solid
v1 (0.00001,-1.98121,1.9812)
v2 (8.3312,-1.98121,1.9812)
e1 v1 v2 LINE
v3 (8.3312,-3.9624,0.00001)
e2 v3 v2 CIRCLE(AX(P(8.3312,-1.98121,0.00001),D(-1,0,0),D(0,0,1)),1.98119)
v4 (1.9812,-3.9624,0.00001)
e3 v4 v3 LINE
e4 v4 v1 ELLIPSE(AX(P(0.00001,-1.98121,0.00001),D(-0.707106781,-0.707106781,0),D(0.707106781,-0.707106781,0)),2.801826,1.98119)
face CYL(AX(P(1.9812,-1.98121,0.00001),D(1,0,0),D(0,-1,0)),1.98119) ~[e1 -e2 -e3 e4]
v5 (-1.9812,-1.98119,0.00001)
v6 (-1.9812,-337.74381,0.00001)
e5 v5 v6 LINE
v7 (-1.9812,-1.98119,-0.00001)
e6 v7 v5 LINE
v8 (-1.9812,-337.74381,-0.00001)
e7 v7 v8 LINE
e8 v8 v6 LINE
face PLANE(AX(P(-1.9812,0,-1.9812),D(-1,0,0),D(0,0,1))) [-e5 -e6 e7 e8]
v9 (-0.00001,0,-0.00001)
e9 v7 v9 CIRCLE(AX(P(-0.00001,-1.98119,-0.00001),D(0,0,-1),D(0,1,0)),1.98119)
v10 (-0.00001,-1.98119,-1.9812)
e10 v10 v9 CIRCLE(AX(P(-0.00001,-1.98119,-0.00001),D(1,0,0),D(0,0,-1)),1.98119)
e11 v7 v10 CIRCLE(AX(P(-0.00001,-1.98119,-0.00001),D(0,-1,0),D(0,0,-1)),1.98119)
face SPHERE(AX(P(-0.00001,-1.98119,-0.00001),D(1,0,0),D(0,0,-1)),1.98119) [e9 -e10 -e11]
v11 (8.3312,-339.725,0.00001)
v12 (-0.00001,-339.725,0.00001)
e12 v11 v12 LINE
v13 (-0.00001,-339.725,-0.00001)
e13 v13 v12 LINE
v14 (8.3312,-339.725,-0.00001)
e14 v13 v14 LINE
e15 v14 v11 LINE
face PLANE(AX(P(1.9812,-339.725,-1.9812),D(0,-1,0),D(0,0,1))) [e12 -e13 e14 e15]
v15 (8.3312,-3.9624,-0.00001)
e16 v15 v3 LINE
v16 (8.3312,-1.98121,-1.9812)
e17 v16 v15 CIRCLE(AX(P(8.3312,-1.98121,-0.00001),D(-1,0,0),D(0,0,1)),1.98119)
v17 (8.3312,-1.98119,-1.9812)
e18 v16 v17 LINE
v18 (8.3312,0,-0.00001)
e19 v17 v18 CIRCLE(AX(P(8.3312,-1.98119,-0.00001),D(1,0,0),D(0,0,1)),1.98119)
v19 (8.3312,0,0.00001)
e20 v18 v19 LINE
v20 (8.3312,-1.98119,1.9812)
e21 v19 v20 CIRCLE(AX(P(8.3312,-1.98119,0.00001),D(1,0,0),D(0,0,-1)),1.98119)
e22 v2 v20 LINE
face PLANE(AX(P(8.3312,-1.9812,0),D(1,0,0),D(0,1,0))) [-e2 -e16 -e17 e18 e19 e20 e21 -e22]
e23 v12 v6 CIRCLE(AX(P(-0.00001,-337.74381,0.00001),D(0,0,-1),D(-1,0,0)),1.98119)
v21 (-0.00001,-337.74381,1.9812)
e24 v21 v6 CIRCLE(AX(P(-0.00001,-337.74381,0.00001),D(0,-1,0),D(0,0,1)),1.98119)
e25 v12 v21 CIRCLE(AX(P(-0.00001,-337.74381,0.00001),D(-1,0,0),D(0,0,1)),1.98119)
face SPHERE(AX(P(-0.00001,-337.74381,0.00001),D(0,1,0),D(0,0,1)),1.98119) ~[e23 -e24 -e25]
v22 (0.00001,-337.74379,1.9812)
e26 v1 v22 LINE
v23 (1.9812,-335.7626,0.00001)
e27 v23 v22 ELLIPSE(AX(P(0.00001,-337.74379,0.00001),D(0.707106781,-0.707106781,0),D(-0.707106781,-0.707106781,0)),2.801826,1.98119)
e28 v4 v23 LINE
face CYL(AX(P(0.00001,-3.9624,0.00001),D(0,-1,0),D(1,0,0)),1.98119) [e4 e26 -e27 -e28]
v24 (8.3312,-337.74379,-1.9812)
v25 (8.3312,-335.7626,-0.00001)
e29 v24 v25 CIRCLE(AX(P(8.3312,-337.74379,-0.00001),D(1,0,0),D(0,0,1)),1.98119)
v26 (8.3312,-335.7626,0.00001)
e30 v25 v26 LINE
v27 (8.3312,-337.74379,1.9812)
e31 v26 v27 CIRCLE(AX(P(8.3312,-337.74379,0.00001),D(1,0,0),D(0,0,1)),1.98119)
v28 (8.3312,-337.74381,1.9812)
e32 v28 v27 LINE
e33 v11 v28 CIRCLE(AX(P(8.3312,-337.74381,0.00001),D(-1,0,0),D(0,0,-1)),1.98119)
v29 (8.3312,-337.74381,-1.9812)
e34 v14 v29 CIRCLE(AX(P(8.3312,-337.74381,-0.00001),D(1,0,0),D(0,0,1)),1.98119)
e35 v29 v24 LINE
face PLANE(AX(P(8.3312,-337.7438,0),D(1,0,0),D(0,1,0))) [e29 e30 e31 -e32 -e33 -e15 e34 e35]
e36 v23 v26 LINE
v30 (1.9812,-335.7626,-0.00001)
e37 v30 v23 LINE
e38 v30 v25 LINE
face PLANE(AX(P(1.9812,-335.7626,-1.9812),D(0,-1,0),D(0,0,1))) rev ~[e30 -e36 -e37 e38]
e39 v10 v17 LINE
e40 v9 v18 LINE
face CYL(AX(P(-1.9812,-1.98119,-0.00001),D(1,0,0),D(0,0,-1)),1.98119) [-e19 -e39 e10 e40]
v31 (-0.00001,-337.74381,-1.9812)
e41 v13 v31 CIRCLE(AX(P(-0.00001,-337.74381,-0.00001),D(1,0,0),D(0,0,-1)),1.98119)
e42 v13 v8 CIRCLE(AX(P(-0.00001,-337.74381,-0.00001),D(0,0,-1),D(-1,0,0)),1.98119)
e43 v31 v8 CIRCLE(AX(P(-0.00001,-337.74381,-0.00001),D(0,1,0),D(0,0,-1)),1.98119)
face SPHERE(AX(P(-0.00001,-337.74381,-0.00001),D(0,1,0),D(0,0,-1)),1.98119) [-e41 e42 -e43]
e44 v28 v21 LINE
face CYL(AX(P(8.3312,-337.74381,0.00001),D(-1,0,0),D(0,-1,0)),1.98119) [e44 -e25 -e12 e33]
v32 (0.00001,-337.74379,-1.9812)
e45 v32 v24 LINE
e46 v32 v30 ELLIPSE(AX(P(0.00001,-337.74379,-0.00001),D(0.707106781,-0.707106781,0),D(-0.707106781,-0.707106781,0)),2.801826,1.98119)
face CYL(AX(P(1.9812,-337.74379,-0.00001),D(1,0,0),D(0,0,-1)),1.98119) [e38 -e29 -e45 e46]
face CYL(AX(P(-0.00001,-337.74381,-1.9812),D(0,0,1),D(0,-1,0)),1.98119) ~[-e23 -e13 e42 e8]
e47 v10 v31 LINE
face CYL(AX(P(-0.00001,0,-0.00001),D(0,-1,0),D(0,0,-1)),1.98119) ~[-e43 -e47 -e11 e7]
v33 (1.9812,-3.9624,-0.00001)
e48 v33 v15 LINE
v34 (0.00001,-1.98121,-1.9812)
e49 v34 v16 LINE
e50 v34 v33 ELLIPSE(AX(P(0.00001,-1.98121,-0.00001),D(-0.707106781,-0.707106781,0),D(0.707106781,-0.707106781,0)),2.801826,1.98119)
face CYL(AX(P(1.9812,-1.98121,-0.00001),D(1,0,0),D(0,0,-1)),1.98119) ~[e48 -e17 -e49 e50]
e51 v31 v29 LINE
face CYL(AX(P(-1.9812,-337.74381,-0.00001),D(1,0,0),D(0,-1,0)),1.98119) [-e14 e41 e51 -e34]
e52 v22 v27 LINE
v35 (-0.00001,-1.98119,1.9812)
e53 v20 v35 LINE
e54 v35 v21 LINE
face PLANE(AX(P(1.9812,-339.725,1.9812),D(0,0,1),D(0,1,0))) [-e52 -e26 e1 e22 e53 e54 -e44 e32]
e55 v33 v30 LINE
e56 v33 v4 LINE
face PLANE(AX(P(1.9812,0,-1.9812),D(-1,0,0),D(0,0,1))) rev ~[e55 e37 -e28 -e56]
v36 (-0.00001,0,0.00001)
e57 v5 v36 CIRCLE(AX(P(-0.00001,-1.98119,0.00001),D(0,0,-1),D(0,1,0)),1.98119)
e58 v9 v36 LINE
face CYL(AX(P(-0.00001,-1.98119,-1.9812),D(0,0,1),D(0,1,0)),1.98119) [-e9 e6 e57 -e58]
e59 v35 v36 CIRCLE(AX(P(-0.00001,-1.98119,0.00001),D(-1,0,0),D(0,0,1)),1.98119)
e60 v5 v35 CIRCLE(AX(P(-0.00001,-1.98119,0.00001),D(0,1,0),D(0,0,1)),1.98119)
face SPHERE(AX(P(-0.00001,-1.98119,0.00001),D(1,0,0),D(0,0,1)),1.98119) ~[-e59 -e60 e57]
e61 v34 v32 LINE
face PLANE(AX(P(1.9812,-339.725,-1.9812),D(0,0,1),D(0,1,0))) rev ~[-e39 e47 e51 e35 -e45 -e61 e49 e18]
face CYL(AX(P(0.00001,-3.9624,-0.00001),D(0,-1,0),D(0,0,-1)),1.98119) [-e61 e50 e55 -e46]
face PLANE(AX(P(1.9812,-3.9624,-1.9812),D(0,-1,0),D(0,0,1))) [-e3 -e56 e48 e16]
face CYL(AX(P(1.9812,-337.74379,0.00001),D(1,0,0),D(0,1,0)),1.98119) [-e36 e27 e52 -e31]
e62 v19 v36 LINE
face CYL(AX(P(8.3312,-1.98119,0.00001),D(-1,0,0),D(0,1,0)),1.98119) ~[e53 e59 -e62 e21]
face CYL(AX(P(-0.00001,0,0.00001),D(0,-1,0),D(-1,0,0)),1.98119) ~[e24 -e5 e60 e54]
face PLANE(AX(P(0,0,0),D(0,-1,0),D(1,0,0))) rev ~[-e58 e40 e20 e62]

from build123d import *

# Parameters (mm, degrees)
F0_W     = 3.9624
F0_H     = 3.9624
F1_DEPTH = 339.725
F2_W     = 3.9624
F2_H     = 3.9624
F3_DEPTH = 6.35
F4_R     = 1.98119


# Not quite as in the source:
# - a fillet or chamfer is up to 0.001 mm smaller than in the source, because OpenCascade refuses the exact size


with BuildPart() as f1:
    # F0 (on Front) → F1 (new body)
    with BuildSketch(Plane.XZ):
        Rectangle(F0_W, F0_H)
    extrude(amount=F1_DEPTH)

    # F2 (on face) → F3 (join)
    with BuildSketch(Plane.YZ.offset(1.9812)):
        with Locations((-337.7438, 0)):
            Rectangle(F2_W, F2_H)
        with Locations((-1.9812, 0)):
            Rectangle(F2_W, F2_H)
    extrude(amount=F3_DEPTH)

    # F4 (radius 1.9812 in the source; OpenCascade refuses exactly that, so slightly less here)
    f4_edges = [f1.edges().sort_by_distance(p)[0] for p in [
        (3.175, 0, 1.9812),
        (3.175, 0, -1.9812),
        (-1.9812, -169.8625, 1.9812),
        (1.9812, -169.8625, 1.9812),
        (-1.9812, -169.8625, -1.9812),
        (1.9812, -169.8625, -1.9812),
        (-1.9812, 0, 0),
        (3.175, -339.725, 1.9812),
        (3.175, -339.725, -1.9812),
        (-1.9812, -339.725, 0),
        (5.1562, -335.7626, -1.9812),
        (5.1562, -3.9624, -1.9812),
        (5.1562, -335.7626, 1.9812),
        (5.1562, -3.9624, 1.9812),
    ]]
    fillet(f4_edges, radius=F4_R)


solid = f1.part
